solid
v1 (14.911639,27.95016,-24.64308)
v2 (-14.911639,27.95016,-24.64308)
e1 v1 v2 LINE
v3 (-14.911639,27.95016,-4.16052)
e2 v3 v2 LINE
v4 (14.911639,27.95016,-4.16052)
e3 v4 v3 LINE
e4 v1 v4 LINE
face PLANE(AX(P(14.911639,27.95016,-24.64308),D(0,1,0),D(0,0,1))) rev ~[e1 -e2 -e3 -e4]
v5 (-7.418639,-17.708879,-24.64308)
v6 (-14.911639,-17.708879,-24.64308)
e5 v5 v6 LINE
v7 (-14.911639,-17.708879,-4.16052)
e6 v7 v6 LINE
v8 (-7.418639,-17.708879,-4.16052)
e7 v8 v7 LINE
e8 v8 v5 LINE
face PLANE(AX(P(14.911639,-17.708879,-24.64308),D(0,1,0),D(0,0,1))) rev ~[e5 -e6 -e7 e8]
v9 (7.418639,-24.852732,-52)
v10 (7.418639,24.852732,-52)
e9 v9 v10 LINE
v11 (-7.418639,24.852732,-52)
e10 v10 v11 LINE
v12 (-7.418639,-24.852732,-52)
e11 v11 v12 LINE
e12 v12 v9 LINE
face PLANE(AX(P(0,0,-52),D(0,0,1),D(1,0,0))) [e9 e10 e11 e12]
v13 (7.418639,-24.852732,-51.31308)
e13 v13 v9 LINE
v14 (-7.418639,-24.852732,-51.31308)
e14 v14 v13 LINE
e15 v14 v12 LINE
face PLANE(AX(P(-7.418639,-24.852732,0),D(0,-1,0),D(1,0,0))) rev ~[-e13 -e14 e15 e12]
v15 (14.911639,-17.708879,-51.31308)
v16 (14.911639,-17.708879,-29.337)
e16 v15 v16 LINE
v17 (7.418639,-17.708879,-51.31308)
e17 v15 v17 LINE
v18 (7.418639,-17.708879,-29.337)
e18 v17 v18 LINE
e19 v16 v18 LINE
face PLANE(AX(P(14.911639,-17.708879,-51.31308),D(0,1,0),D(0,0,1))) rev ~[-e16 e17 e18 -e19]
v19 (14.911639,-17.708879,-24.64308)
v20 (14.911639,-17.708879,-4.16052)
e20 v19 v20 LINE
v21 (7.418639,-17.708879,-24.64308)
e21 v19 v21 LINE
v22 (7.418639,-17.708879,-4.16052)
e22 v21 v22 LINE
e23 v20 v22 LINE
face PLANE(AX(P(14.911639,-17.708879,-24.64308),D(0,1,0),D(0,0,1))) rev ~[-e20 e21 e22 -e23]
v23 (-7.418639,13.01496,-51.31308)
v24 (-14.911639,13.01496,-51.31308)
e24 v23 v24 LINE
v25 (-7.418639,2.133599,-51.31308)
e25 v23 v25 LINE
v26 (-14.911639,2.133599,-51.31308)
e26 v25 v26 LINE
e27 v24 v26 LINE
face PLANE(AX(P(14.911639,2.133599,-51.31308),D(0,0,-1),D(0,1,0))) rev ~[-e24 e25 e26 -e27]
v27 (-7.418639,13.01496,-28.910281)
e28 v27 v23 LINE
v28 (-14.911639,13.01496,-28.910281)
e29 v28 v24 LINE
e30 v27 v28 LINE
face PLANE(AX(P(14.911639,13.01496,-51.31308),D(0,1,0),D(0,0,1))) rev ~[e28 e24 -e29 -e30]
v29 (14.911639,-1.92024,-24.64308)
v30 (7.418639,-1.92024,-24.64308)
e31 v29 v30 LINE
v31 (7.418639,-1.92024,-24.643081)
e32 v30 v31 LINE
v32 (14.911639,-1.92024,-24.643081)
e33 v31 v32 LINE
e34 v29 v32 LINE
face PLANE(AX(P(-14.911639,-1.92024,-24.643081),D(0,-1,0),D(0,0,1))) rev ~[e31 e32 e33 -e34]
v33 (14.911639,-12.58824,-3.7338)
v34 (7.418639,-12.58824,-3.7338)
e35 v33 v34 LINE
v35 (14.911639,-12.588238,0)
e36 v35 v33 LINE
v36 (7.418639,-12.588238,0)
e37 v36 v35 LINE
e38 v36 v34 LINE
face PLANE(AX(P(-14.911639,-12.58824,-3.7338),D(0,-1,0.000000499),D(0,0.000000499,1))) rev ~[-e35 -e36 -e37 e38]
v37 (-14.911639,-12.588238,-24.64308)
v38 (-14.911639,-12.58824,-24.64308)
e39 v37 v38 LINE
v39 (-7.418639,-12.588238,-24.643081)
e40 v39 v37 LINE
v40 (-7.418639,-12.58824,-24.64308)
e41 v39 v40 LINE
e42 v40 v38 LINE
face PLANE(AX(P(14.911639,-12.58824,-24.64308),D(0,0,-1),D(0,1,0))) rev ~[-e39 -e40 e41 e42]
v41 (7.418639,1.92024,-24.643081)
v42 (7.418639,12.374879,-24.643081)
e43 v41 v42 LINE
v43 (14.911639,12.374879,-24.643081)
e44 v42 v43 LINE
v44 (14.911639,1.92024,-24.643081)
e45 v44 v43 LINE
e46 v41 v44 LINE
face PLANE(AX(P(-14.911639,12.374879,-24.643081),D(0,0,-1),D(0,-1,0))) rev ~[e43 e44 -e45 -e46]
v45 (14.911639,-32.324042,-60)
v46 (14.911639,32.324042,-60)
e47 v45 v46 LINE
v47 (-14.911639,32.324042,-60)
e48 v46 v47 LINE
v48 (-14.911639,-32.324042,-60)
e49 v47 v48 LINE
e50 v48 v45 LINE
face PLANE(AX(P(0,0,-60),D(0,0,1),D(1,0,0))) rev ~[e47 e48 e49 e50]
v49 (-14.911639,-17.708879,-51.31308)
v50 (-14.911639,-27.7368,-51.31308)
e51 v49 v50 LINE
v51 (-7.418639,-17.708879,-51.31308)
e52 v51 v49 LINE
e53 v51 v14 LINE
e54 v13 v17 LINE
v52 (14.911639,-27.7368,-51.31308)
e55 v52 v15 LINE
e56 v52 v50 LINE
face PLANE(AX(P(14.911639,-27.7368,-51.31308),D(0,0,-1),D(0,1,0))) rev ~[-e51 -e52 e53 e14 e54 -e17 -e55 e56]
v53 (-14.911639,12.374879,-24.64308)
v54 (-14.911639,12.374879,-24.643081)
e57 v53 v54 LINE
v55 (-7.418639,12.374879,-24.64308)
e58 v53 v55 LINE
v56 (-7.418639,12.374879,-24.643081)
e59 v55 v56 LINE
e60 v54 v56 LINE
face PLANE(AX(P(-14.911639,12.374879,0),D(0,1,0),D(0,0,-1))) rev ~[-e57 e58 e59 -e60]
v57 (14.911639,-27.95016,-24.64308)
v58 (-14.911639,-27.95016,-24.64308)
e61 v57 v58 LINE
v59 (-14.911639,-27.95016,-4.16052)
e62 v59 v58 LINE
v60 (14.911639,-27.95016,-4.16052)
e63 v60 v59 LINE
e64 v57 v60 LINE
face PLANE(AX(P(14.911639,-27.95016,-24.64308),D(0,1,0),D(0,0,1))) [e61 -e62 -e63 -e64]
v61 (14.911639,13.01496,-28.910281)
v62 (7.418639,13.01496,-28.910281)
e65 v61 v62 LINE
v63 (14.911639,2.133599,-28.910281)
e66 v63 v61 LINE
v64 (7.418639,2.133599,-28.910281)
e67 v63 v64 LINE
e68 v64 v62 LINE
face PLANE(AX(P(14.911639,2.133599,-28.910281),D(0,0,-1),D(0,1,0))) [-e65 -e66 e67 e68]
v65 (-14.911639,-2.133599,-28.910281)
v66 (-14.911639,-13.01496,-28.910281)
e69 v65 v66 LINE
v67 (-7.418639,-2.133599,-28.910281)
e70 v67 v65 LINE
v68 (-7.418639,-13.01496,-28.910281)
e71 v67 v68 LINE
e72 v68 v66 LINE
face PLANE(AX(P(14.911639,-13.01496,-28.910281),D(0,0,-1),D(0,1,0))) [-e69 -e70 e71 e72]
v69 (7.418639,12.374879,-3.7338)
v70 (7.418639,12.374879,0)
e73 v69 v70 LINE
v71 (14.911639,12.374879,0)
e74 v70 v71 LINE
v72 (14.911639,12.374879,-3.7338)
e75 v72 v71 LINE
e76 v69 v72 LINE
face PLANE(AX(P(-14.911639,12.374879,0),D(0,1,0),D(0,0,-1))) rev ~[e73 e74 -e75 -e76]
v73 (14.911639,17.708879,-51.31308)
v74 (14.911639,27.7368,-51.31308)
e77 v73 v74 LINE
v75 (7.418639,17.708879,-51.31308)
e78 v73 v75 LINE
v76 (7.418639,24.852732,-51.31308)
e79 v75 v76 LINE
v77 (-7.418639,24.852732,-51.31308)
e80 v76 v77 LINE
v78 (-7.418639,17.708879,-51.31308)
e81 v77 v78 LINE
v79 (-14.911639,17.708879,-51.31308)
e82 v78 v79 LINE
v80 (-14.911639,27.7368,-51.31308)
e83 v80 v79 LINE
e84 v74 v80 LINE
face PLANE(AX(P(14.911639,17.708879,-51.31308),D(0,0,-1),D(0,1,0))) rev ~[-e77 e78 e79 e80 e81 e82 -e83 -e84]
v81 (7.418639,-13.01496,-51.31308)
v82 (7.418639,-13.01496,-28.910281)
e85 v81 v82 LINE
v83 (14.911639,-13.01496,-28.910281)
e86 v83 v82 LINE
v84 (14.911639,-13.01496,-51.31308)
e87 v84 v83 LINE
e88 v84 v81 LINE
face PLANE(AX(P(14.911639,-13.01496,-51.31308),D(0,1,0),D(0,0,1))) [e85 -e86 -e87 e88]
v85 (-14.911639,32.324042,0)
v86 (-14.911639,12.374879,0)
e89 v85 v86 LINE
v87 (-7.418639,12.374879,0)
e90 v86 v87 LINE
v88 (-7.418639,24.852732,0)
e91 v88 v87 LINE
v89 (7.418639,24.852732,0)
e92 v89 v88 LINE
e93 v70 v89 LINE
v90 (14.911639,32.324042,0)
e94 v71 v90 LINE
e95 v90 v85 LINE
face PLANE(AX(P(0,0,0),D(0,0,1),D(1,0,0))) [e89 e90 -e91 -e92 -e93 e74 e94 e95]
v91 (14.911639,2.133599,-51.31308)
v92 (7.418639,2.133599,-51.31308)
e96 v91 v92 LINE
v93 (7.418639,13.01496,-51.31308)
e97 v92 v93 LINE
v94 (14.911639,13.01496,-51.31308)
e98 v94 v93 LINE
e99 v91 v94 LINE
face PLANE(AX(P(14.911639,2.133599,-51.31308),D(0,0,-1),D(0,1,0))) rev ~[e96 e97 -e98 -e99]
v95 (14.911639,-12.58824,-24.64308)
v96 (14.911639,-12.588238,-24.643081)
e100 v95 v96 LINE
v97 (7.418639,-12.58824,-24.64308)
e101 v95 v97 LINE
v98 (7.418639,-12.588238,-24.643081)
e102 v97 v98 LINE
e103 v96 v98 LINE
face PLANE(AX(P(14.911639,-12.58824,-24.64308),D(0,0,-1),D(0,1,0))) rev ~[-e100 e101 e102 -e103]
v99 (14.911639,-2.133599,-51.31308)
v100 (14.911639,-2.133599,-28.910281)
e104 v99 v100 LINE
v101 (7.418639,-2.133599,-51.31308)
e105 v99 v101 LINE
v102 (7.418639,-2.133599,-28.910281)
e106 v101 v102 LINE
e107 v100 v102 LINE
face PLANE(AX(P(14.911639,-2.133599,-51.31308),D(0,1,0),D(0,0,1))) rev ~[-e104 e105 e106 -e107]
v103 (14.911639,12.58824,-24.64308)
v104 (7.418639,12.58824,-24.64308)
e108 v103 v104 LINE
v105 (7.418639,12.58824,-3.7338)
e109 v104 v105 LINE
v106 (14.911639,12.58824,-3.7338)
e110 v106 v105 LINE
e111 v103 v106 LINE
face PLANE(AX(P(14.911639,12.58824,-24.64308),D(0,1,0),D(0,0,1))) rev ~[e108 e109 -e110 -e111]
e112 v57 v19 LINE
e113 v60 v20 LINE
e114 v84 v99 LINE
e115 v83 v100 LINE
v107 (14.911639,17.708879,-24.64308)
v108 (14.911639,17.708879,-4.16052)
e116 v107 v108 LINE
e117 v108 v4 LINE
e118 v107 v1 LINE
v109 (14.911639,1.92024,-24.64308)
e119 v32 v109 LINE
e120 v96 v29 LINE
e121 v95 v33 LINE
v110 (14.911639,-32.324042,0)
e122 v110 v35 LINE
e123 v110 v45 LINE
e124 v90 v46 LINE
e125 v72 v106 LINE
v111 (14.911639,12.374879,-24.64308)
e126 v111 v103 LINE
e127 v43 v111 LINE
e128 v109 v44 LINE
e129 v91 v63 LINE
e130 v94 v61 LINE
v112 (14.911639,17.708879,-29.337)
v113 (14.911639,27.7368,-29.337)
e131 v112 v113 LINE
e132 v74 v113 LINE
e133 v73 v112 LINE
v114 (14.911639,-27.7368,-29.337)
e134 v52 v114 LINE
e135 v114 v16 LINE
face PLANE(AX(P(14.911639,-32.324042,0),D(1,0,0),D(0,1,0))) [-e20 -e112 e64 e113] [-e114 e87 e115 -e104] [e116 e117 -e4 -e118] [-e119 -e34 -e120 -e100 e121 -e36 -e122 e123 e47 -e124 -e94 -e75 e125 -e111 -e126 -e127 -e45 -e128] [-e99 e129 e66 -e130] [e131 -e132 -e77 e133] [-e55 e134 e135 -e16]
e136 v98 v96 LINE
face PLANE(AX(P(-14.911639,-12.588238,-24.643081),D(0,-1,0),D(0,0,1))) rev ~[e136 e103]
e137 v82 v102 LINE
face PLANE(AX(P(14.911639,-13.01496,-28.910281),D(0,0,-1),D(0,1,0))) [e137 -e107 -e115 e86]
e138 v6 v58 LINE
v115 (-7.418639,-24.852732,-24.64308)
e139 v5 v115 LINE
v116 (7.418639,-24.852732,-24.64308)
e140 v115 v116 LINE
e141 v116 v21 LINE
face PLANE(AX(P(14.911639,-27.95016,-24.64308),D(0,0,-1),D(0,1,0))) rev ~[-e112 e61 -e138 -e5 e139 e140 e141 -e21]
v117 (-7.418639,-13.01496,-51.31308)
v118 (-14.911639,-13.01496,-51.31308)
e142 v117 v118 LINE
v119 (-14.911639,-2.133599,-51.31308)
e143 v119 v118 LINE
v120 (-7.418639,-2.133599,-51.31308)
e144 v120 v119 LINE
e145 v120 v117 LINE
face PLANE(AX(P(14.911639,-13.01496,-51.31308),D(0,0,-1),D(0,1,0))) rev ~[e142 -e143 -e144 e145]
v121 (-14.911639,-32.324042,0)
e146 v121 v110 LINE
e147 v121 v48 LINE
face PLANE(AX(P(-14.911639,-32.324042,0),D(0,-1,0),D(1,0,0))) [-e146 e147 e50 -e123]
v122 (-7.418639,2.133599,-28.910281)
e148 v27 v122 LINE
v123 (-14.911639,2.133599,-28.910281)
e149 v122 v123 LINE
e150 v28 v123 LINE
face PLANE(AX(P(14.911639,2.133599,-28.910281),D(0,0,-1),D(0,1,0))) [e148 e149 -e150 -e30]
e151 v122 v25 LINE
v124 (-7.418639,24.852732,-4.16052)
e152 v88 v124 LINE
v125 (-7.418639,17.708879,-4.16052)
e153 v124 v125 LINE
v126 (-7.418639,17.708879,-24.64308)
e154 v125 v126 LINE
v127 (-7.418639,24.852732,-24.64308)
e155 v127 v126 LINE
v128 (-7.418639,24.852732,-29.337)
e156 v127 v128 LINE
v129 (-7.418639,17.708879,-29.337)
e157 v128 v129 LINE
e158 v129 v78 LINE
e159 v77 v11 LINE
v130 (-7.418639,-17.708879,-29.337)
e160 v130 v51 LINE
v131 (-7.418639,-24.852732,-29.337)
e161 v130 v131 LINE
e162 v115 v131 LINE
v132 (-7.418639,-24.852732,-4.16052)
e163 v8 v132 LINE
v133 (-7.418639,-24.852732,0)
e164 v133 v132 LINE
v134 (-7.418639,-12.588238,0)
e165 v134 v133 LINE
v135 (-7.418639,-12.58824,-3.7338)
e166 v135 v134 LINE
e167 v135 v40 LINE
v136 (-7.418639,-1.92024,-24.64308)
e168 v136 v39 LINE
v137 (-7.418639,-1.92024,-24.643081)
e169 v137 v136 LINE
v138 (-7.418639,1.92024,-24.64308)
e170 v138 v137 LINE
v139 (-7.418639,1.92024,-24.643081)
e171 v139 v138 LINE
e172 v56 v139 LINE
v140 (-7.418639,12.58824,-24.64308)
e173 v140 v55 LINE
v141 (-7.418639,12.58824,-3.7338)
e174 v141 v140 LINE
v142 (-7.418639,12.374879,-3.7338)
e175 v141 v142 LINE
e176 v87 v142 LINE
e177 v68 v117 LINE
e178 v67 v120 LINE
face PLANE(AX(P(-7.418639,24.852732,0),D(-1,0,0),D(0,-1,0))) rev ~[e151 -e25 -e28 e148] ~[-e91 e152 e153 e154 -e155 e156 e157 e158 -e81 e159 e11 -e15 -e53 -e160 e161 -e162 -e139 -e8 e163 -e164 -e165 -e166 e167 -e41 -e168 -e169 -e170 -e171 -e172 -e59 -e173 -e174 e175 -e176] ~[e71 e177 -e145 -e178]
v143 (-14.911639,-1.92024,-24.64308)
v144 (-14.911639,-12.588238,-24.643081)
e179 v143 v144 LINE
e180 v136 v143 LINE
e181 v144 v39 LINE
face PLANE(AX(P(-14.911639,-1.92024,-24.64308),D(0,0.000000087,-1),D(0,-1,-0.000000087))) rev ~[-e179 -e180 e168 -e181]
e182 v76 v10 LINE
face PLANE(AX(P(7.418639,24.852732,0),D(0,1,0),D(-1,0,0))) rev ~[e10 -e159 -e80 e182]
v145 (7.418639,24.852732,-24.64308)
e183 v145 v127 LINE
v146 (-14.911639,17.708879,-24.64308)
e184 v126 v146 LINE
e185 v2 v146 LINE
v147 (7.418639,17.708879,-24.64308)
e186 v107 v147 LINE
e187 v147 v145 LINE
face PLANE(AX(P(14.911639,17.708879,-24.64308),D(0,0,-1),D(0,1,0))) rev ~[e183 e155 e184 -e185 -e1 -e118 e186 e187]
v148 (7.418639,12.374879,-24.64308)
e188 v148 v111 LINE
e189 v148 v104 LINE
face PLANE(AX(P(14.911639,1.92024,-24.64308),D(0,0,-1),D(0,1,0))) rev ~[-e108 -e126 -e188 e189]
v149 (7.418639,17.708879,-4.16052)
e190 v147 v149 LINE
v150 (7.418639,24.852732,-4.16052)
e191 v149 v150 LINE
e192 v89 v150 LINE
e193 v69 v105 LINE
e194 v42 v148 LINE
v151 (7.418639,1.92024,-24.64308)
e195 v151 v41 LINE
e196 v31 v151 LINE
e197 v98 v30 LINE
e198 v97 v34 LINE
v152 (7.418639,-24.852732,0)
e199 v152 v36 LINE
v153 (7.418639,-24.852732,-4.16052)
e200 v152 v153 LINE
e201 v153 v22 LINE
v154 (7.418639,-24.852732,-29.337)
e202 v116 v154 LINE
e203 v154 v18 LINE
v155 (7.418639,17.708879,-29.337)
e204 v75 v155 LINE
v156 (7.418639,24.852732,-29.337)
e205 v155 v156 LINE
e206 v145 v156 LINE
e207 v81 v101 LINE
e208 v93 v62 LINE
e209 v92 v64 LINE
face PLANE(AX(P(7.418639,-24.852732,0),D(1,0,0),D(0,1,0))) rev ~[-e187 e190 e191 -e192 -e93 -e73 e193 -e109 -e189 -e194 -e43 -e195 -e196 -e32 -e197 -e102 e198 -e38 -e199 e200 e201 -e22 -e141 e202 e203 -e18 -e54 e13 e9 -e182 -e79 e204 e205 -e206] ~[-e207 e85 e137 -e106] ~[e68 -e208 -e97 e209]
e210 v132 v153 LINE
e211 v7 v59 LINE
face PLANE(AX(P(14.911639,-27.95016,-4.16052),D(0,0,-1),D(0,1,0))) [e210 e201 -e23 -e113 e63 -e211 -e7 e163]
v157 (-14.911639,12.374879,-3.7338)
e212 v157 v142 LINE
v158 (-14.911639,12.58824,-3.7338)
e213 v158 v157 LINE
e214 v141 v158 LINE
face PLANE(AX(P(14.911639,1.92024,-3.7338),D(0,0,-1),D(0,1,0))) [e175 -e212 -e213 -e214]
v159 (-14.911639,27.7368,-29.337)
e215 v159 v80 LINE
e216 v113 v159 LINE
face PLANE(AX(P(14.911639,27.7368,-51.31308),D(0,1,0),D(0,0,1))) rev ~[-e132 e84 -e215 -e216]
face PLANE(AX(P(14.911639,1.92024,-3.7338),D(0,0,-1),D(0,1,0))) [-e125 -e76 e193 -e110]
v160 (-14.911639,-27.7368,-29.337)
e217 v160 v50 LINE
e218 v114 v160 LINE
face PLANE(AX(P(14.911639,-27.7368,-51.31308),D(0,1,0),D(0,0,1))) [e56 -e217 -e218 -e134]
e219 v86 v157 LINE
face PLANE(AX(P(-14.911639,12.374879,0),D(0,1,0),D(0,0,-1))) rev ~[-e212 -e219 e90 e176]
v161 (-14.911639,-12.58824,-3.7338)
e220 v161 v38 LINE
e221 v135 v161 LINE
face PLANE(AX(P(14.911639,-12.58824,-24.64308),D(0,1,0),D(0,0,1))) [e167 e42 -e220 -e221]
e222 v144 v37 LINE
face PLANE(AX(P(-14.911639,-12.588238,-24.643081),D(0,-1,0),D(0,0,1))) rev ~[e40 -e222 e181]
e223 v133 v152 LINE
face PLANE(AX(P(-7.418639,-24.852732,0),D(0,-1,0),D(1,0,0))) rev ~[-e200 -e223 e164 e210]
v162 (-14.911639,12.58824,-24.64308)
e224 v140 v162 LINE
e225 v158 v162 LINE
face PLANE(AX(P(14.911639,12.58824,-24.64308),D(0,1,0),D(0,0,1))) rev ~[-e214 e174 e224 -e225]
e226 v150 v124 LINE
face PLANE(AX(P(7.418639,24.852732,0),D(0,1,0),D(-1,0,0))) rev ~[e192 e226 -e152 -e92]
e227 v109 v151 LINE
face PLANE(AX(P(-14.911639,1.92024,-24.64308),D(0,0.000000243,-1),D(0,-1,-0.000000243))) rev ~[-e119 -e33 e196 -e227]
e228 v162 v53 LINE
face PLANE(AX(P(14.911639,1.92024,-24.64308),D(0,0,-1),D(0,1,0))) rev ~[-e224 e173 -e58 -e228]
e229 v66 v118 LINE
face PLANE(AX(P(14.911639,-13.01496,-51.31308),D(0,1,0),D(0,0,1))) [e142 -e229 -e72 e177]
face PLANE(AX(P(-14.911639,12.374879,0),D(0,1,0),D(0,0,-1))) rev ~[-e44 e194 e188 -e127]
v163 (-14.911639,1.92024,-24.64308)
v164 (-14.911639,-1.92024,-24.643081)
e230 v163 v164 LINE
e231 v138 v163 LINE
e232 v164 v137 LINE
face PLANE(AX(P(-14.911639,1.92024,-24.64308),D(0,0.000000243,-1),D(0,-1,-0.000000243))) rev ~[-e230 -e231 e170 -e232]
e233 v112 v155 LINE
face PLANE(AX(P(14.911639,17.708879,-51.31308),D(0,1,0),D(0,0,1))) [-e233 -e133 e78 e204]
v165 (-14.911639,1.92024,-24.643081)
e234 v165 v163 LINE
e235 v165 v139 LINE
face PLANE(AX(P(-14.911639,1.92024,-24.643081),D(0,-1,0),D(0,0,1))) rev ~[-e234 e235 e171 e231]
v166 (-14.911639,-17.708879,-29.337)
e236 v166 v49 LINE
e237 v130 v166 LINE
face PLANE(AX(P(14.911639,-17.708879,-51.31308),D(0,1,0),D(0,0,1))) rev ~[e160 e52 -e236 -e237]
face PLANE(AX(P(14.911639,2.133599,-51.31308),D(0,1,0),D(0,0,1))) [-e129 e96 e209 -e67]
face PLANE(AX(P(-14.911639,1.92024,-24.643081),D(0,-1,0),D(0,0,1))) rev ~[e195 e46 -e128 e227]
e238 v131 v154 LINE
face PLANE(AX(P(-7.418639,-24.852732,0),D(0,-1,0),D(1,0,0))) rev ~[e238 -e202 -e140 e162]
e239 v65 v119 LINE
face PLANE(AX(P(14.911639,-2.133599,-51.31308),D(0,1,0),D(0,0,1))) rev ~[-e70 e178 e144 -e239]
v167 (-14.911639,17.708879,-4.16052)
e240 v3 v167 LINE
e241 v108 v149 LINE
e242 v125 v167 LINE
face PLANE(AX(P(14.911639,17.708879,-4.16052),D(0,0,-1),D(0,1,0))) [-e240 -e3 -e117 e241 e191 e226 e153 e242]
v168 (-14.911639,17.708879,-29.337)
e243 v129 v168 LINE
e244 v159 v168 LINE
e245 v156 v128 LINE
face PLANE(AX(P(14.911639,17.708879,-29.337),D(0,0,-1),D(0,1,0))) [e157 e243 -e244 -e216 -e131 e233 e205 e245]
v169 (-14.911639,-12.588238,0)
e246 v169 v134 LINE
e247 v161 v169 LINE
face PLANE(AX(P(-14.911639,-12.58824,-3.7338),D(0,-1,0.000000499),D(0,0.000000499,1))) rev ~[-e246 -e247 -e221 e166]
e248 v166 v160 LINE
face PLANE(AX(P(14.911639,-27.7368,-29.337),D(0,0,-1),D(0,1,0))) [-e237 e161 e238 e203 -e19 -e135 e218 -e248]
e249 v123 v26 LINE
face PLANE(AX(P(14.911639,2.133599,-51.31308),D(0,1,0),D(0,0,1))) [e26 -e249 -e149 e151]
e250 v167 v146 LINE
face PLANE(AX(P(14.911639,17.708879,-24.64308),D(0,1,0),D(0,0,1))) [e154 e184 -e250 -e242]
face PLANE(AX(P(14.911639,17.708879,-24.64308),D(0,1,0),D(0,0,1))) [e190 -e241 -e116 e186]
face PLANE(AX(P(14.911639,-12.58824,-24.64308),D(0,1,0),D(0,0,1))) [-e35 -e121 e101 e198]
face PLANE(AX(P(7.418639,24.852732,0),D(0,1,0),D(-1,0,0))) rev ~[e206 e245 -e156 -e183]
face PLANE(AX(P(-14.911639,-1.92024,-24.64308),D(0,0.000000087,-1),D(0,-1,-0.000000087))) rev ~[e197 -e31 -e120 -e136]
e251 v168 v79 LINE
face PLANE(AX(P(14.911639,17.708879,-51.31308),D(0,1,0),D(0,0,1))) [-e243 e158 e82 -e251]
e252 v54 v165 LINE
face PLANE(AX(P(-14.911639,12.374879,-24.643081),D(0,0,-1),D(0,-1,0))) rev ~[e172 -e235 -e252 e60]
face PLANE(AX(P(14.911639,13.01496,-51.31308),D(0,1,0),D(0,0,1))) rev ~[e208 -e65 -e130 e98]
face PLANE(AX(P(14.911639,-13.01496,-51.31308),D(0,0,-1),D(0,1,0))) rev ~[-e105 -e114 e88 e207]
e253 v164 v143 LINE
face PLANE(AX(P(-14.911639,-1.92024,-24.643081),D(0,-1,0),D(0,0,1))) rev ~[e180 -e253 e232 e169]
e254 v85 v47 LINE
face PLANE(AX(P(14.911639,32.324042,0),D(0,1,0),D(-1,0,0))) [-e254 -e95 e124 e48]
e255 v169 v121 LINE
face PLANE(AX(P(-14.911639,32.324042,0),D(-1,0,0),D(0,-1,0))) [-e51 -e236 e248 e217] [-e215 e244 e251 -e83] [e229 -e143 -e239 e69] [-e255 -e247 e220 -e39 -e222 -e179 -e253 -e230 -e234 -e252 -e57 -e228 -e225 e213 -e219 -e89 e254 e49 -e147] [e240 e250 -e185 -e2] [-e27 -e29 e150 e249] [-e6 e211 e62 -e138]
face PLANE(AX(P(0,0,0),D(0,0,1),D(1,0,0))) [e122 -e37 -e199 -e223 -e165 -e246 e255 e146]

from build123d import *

# Parameters (mm, degrees)
F2_DEPTH = 60
F3_DEPTH = 52
F4_W     = 10.2412812412
F4_H     = 20.4825601541
F4_W_2   = 10.6680002064
F4_H_2   = 20.9092802834
F4_W_3   = 10.0279208273
F4_H_3   = 21.9760797918
F4_W_4   = 10.8813615516
F4_H_4   = 22.402798757
F5_DEPTH = 29.8242783788
F6_W     = 10.4546393268
F6_H     = 20.9092812147
F7_DEPTH = 29.8242783788


# Not quite as in the source:
# - ends of sketch curves that miss each other by under 0.0002 mm in the source are joined


with BuildPart() as f2:
    # F0 (on Top) → F2 (new body)
    with BuildSketch(Plane.XY):
        Polygon((-14.9116391894, 32.3240421712), (-14.9116391894, 24.8527319824), (-14.9116391894, -24.8527319824), (-14.9116391894, -32.3240421712), (14.9116391894, -32.3240421712), (14.9116391894, -24.8527319824), (14.9116391894, 24.8527319824), (14.9116391894, 32.3240421712), align=None)
        Polygon((-7.4186391894, 24.8527319824), (-0.0743608106, 24.8527319824), (0.0743608106, 24.8527319824), (7.4186391894, 24.8527319824), (7.4186391894, 0), (7.4186391894, -24.8527319824), (-7.4186391894, -24.8527319824), (-7.4186391894, 0), align=None, mode=Mode.SUBTRACT)
        Polygon((0.0743608106, 24.8527319824), (-0.0743608106, 24.8527319824), (-7.4186391894, 24.8527319824), (-7.4186391894, 0), (-7.4186391894, -24.8527319824), (7.4186391894, -24.8527319824), (7.4186391894, 0), (7.4186391894, 24.8527319824), align=None)
    extrude(amount=-F2_DEPTH)

    # F1 (on face) → F3 (cut)
    with BuildSketch(Plane.XY):
        Polygon((7.4186391894, 24.8527319824), (0.0743608106, 24.8527319824), (-0.0743608106, 24.8527319824), (-7.4186391894, 24.8527319824), (-7.4186391894, 0), (-7.4186391894, -24.8527319824), (7.4186391894, -24.8527319824), (7.4186391894, 0), align=None)
    extrude(amount=-F3_DEPTH, mode=Mode.SUBTRACT)

    # F4 (on face) → F5 (cut, through all)
    with BuildSketch(Plane.YZ.offset(14.9116391894)):
        with Locations((-22.8295195848, -14.401800232)):
            Rectangle(F4_W, F4_H)
        with Locations((-7.2542401031, -14.1884401673)):
            Rectangle(F4_W_2, F4_H_2)
        with Locations((7.2542401031, -14.1884401673)):
            Rectangle(F4_W_2, F4_H_2)
        with Locations((22.8295195848, -14.401800232)):
            Rectangle(F4_W, F4_H)
        with Locations((22.7228393778, -40.3250399977)):
            Rectangle(F4_W_3, F4_H_3)
        with Locations((7.5742793269, -40.1116805151)):
            Rectangle(F4_W_4, F4_H_4)
        with Locations((-7.5742793269, -40.1116805151)):
            Rectangle(F4_W_4, F4_H_4)
        with Locations((-22.7228393778, -40.3250399977)):
            Rectangle(F4_W_3, F4_H_3)
    extrude(amount=-F5_DEPTH, mode=Mode.SUBTRACT)

    # F6 (on face) → F7 (cut, through all)
    with BuildSketch(Plane(origin=(-14.9116391894, 0, 0), x_dir=(0, -1, 0), z_dir=(-1, 0, 0))):
        Polygon((12.5882383436, 0), (-12.3748793267, 0), (-12.3748793267, -3.7338000257), (-1.9202399999, -3.7338000257), (-1.9202399999, -24.643080309), (1.9202399999, -24.6430812404), (1.9202399999, -3.7338000257), (12.5882402062, -3.7338000257), align=None)
        with Locations((-7.1475596633, -14.188440633)):
            Rectangle(F6_W, F6_H)
        Polygon((12.5882383436, -24.6430812404), (12.5882383436, -3.7338000257), (1.9202399999, -3.7338000257), (1.9202399999, -24.643080309), align=None)
    extrude(amount=-F7_DEPTH, mode=Mode.SUBTRACT)


solid = f2.part
